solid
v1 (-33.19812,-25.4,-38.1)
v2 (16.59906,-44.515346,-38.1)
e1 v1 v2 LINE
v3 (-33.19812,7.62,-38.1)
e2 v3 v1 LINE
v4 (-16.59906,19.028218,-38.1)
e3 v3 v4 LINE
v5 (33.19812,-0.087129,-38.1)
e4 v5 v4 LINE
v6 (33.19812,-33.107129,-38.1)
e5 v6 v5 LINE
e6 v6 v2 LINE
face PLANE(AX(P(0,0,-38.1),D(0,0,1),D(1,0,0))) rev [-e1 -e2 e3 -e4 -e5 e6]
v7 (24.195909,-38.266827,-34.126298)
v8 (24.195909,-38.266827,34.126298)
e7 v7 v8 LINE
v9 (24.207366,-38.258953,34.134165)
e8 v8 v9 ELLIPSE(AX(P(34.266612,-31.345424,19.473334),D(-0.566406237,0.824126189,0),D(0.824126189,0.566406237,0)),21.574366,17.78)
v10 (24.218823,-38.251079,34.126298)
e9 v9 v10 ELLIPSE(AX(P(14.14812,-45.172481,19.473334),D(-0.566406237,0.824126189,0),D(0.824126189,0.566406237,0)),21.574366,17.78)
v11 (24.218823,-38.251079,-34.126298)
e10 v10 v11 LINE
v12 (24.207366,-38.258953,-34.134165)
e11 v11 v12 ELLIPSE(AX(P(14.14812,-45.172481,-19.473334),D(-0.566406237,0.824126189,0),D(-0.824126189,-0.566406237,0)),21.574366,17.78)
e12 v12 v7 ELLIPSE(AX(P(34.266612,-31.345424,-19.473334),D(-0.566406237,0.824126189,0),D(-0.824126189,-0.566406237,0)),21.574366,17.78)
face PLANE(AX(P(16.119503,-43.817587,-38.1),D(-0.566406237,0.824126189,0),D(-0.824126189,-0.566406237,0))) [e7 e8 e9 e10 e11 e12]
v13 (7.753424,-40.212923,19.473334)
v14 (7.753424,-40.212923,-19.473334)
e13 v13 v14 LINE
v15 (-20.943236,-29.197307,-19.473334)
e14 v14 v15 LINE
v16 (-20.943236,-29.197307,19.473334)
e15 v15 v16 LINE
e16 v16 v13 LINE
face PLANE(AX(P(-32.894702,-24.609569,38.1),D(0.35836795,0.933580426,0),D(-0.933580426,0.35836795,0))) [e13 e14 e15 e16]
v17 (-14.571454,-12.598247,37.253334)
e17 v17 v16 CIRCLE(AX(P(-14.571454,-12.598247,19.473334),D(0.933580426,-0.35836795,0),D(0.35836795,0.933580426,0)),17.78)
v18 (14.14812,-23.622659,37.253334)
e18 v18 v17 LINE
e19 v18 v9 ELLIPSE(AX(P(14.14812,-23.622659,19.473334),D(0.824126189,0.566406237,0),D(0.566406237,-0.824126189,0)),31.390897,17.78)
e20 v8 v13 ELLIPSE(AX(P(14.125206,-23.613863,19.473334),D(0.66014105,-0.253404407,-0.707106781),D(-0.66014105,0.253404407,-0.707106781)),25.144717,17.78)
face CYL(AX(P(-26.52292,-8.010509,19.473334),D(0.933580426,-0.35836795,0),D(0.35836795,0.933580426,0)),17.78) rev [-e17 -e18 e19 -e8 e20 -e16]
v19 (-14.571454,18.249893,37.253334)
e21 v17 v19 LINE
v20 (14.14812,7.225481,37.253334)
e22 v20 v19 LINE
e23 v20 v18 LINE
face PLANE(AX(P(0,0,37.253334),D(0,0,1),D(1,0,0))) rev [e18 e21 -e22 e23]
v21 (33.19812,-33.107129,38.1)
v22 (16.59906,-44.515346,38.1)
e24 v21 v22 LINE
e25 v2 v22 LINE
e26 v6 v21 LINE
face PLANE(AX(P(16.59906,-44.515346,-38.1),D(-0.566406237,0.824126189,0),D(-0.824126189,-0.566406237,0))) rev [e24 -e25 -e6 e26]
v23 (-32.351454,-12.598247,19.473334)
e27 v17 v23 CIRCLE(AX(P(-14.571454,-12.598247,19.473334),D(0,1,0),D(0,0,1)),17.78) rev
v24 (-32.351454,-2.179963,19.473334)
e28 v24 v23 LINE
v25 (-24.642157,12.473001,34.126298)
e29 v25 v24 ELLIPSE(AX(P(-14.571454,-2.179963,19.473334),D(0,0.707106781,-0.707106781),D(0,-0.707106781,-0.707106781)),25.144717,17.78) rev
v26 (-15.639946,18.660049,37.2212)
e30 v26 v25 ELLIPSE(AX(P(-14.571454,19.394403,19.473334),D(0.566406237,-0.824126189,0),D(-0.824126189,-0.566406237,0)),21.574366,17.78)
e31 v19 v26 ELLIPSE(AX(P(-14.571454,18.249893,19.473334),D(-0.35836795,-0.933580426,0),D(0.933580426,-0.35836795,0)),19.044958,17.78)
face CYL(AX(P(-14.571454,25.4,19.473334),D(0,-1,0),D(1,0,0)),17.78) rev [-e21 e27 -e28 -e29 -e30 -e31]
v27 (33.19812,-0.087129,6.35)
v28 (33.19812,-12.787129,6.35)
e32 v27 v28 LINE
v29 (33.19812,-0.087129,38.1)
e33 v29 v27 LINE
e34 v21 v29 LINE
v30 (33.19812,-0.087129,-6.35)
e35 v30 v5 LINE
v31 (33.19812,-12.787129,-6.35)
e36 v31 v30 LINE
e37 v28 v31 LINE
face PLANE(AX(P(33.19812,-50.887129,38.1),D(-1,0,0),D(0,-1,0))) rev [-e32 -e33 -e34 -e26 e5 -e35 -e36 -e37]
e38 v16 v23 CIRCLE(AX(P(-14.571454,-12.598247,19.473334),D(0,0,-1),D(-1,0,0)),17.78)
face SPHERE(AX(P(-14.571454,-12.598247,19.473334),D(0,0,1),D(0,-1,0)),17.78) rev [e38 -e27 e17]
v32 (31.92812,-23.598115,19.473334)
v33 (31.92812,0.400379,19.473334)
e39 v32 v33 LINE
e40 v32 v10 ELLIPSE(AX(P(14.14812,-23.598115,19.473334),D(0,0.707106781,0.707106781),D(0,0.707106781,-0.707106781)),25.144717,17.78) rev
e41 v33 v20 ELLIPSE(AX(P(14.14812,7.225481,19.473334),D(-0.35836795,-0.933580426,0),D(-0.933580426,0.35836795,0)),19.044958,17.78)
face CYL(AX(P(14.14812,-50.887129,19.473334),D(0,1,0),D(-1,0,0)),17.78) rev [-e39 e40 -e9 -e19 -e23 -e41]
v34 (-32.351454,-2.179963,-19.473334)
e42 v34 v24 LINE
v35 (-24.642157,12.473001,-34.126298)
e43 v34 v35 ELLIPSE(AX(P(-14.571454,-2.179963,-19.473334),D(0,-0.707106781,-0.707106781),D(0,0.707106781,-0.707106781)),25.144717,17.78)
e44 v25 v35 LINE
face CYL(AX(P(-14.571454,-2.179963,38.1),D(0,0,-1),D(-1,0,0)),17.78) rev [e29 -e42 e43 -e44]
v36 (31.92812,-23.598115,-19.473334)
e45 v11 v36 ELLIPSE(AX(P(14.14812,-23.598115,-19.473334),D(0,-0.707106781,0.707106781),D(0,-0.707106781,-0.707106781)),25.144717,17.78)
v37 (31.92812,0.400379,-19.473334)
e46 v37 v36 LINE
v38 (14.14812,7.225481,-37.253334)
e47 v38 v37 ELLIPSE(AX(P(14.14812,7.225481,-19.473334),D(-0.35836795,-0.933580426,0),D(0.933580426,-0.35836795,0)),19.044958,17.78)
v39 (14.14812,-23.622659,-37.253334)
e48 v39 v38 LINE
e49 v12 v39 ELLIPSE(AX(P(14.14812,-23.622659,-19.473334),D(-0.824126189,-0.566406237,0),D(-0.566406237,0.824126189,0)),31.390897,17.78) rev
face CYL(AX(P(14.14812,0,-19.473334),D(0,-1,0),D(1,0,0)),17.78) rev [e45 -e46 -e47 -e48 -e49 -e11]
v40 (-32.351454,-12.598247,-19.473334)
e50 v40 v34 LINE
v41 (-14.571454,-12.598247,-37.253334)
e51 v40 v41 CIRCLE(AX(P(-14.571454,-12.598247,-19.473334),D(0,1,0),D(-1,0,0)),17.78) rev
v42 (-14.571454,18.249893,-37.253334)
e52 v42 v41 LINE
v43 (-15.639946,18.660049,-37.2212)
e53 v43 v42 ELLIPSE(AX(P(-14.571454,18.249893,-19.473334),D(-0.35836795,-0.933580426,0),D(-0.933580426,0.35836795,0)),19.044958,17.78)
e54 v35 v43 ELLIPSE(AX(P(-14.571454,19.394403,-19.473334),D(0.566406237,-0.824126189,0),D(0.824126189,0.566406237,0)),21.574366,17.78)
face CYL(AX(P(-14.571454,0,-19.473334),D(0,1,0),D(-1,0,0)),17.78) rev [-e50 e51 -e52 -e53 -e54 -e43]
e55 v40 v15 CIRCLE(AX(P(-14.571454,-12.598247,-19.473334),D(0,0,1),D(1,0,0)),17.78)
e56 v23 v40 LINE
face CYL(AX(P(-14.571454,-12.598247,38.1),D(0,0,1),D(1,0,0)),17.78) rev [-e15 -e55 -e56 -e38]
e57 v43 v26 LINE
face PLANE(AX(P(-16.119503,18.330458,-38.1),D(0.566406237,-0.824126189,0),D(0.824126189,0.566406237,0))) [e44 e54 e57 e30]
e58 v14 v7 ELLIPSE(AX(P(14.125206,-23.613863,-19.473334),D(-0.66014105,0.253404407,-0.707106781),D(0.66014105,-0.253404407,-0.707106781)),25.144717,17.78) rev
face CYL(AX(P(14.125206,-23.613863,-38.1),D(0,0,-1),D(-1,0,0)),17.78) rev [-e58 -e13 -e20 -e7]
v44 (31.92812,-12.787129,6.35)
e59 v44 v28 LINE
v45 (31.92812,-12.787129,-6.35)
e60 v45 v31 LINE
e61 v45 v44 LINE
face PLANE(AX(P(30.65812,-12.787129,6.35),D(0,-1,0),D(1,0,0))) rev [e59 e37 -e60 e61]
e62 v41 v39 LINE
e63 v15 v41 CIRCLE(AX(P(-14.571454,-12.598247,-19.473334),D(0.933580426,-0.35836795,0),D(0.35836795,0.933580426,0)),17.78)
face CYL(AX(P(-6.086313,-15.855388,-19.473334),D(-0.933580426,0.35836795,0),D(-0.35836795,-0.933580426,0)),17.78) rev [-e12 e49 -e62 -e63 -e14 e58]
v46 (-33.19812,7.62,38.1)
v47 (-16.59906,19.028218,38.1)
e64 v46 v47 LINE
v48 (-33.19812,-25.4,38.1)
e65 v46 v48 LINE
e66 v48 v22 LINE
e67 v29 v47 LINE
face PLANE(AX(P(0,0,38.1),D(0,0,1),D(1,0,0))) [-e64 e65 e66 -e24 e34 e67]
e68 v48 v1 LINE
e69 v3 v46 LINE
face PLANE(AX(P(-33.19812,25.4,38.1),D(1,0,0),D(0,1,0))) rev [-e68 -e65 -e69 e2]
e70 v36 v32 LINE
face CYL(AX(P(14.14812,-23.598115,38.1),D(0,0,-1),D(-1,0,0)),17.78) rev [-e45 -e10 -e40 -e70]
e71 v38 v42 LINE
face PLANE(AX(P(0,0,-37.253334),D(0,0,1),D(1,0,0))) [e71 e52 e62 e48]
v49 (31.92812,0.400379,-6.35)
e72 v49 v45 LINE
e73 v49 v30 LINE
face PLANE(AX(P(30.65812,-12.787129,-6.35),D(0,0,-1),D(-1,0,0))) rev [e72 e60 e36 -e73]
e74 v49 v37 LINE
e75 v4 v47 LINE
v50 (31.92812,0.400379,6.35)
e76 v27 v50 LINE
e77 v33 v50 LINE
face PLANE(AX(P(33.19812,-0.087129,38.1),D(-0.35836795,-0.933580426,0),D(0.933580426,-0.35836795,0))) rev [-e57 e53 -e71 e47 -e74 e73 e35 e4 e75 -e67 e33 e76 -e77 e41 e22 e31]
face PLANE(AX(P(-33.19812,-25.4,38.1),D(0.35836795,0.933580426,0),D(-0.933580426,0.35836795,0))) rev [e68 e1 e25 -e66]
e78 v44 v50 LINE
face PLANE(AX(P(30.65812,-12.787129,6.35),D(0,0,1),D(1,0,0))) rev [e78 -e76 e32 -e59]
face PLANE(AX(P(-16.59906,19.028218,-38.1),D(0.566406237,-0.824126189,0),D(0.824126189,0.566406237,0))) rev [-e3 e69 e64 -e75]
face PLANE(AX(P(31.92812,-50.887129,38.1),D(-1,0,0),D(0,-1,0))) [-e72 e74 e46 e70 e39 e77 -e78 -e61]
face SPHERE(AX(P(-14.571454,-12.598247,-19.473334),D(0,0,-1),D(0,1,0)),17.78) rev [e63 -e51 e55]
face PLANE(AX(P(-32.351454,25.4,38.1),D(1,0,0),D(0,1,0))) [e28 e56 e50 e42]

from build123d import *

# Parameters (mm, degrees)
BOSS_EXTRUDE1_DEPTH = 38.1
CUT_EXTRUDE1_DEPTH  = 98.457965419
SHELL1_START        = -37.25333418
SHELL1_DEPTH        = 74.50666836
FILLET1_R           = 17.78
SKETCH3_W           = 12.7
SKETCH3_H           = 13.97
CUT_EXTRUDE2_DEPTH  = 2.54


# Read off the part's stored shape, not the designer's step: Shell1
with BuildPart() as part:
    # Sketch1 → Boss-Extrude1 (new, symmetric)
    with BuildSketch(Plane.XY):
        Polygon((-33.198119966, 25.4), (-33.198119966, -25.4), (33.198119966, -50.887128572), (33.198119966, -0.087128572), align=None)
    extrude(amount=BOSS_EXTRUDE1_DEPTH, both=True)

    # Sketch2 → Cut-Extrude1 (cut, through all)
    with BuildSketch(Plane.XY.offset(38.1)):
        Polygon((16.599059983, -44.515346429), (33.198119966, -33.107128572), (33.198119966, -50.887128572), align=None)
        Polygon((-16.599059983, 19.028217857), (-33.198119966, 25.4), (-33.198119966, 7.62), align=None)
    extrude(amount=-CUT_EXTRUDE1_DEPTH, mode=Mode.SUBTRACT)

    # Shell1 outline → Shell1 (cut)
    with BuildSketch(Plane.XY.offset(SHELL1_START)):
        Polygon((-32.351454146, 7.174547563), (-32.351454146, -24.818102704), (16.486612201, -43.565279915), (31.928119966, -32.952625656), (31.928119966, 0.400378753), (-15.639946381, 18.66004864), align=None)
    extrude(amount=SHELL1_DEPTH, mode=Mode.SUBTRACT)

    # Fillet1
    # the kernel refuses this fillet: 17.78 mm, written as the material it adds along each edge
    with BuildSketch(Plane(origin=(-14.571454146, -12.59824726, -19.47333418), x_dir=(-1, 0, 0), z_dir=(0, 0, -1))) as fillet1_piece_1_section:
        Polygon((0, 0), (FILLET1_R * 1.02, 0), (FILLET1_R * 1.02, -FILLET1_R * 0.701026577777), (FILLET1_R * 0.365535308531, -FILLET1_R * 0.952252035029), align=None)
    fillet1_piece_1 = extrude(amount=FILLET1_R * 1.02, mode=Mode.PRIVATE)
    fillet1_piece_1 = fillet1_piece_1 - Plane(origin=(-14.571454146, -12.59824726, -19.47333418), x_dir=(0.8241261886205663, 0.5664062369269417, 0), z_dir=(0, 0, -1)) * Sphere(FILLET1_R, mode=Mode.PRIVATE)
    add(fillet1_piece_1)
    with BuildSketch(Plane(origin=(-14.571454146, -12.59824726, 19.47333418), x_dir=(-1, 0, 0), z_dir=(0, 0, 1))) as fillet1_piece_2_section:
        Polygon((0, 0), (FILLET1_R * 1.02, 0), (FILLET1_R * 1.02, FILLET1_R * 0.701026577777), (FILLET1_R * 0.365535308531, FILLET1_R * 0.952252035029), align=None)
    fillet1_piece_2 = extrude(amount=FILLET1_R * 1.02, mode=Mode.PRIVATE)
    fillet1_piece_2 = fillet1_piece_2 - Plane(origin=(-14.571454146, -12.59824726, 19.47333418), x_dir=(0.8241261886205663, 0.5664062369269417, 0), z_dir=(0, 0, 1)) * Sphere(FILLET1_R, mode=Mode.PRIVATE)
    add(fillet1_piece_2)
    with BuildSketch(Plane(origin=(-20.943236289, -29.197307243, -37.25333418), x_dir=(0.3583679495405225, 0.9335804264990358, 0), z_dir=(0.9335804264990358, -0.3583679495405224, 0))) as fillet1_piece_3_section:
        with BuildLine():
            CenterArc((FILLET1_R, FILLET1_R), FILLET1_R, 180, 90)
            Line((0, FILLET1_R), (0, 0))
            Line((0, 0), (FILLET1_R, 0))
        make_face()
    fillet1_piece_3 = extrude(amount=84.542794822, mode=Mode.PRIVATE)
    fillet1_piece_3 = split(fillet1_piece_3, bisect_by=Plane(origin=(31.928119966, -33.01813641, -33.386694553), z_dir=(-1, 0, 0)), keep=Keep.TOP, mode=Mode.PRIVATE)
    fillet1_piece_3 = split(fillet1_piece_3, bisect_by=Plane(origin=(10.612775853, -47.602255791, -33.386694553), z_dir=(-0.5664062369254325, 0.8241261886216036, 0)), keep=Keep.TOP, mode=Mode.PRIVATE)
    add(fillet1_piece_3)
    with BuildSketch(Plane(origin=(31.928119966, -77.402625656, -37.25333418), x_dir=(-1, 0, 0), z_dir=(0, 1, 0))) as fillet1_piece_4_section:
        with BuildLine():
            CenterArc((FILLET1_R, FILLET1_R), FILLET1_R, 180, 90)
            Line((0, FILLET1_R), (0, 0))
            Line((0, 0), (FILLET1_R, 0))
        make_face()
    fillet1_piece_4 = extrude(amount=122.253004409, mode=Mode.PRIVATE)
    fillet1_piece_4 = split(fillet1_piece_4, bisect_by=Plane(origin=(33.987840467, -0.39027387, -33.467977185), z_dir=(-0.3583679495453051, -0.9335804264972, 0)), keep=Keep.TOP, mode=Mode.PRIVATE)
    fillet1_piece_4 = split(fillet1_piece_4, bisect_by=Plane(origin=(17.295340959, -43.875721799, -33.467977185), z_dir=(0.3583679495405224, 0.9335804264990358, 0)), keep=Keep.TOP, mode=Mode.PRIVATE)
    fillet1_piece_4 = split(fillet1_piece_4, bisect_by=Plane(origin=(36.497116542, -29.812441309, -33.467977185), z_dir=(-0.5664062369254325, 0.8241261886216036, 0)), keep=Keep.TOP, mode=Mode.PRIVATE)
    add(fillet1_piece_4)
    with BuildSketch(Plane(origin=(-32.351454146, 51.624547563, 37.25333418), x_dir=(1, 0, 0), z_dir=(0, -1, 0))) as fillet1_piece_5_section:
        with BuildLine():
            CenterArc((FILLET1_R, -FILLET1_R), FILLET1_R, 90, 90)
            Line((0, -FILLET1_R), (0, 0))
            Line((0, 0), (FILLET1_R, 0))
        make_face()
    fillet1_piece_5 = extrude(amount=64.222794823, mode=Mode.PRIVATE)
    fillet1_piece_5 = split(fillet1_piece_5, bisect_by=Plane(origin=(-19.793272657, 20.254361223, 33.481549938), z_dir=(-0.3583679495453051, -0.9335804264972, 0)), keep=Keep.TOP, mode=Mode.PRIVATE)
    fillet1_piece_5 = split(fillet1_piece_5, bisect_by=Plane(origin=(-33.346924572, 6.490379695, 33.481549938), z_dir=(0.5664062369446778, -0.8241261886083766, 0)), keep=Keep.TOP, mode=Mode.PRIVATE)
    add(fillet1_piece_5)
    with BuildSketch(Plane(origin=(-20.943236289, -29.197307243, 37.25333418), x_dir=(0.3583679495405225, 0.9335804264990358, 0), z_dir=(0.9335804264990358, -0.3583679495405224, 0))) as fillet1_piece_6_section:
        with BuildLine():
            CenterArc((FILLET1_R, -FILLET1_R), FILLET1_R, 90, 90)
            Line((0, -FILLET1_R), (0, 0))
            Line((0, 0), (FILLET1_R, 0))
        make_face()
    fillet1_piece_6 = extrude(amount=84.542794822, mode=Mode.PRIVATE)
    fillet1_piece_6 = split(fillet1_piece_6, bisect_by=Plane(origin=(31.928119966, -33.01813641, 33.386694553), z_dir=(-1, 0, 0)), keep=Keep.TOP, mode=Mode.PRIVATE)
    fillet1_piece_6 = split(fillet1_piece_6, bisect_by=Plane(origin=(10.612775853, -47.602255791, 33.386694553), z_dir=(-0.5664062369254325, 0.8241261886216036, 0)), keep=Keep.TOP, mode=Mode.PRIVATE)
    add(fillet1_piece_6)
    with BuildSketch(Plane(origin=(31.928119966, -77.402625656, 37.25333418), x_dir=(-1, 0, 0), z_dir=(0, 1, 0))) as fillet1_piece_7_section:
        with BuildLine():
            CenterArc((FILLET1_R, -FILLET1_R), FILLET1_R, 90, 90)
            Line((0, -FILLET1_R), (0, 0))
            Line((0, 0), (FILLET1_R, 0))
        make_face()
    fillet1_piece_7 = extrude(amount=122.253004409, mode=Mode.PRIVATE)
    fillet1_piece_7 = split(fillet1_piece_7, bisect_by=Plane(origin=(33.987840467, -0.39027387, 33.467977185), z_dir=(-0.3583679495453051, -0.9335804264972, 0)), keep=Keep.TOP, mode=Mode.PRIVATE)
    fillet1_piece_7 = split(fillet1_piece_7, bisect_by=Plane(origin=(17.295340959, -43.875721799, 33.467977185), z_dir=(0.3583679495405224, 0.9335804264990358, 0)), keep=Keep.TOP, mode=Mode.PRIVATE)
    fillet1_piece_7 = split(fillet1_piece_7, bisect_by=Plane(origin=(36.497116542, -29.812441309, 33.467977185), z_dir=(-0.5664062369254325, 0.8241261886216036, 0)), keep=Keep.TOP, mode=Mode.PRIVATE)
    add(fillet1_piece_7)
    with BuildSketch(Plane(origin=(-32.351454146, -24.818102704, -19.47333418), x_dir=(0, 1, 0), z_dir=(0, 0, 1))) as fillet1_piece_8:
        with BuildLine():
            CenterArc((FILLET1_R * 0.687280958605, -FILLET1_R), FILLET1_R, 90, 69)
            Line((-FILLET1_R * 0.246299467894, -FILLET1_R * 0.641632050459), (0, 0))
            Line((0, 0), (FILLET1_R * 0.687280958605, 0))
        make_face()
    extrude(amount=38.94666836)
    with BuildSketch(Plane(origin=(-32.351454146, 51.624547563, -37.25333418), x_dir=(1, 0, 0), z_dir=(0, -1, 0))) as fillet1_piece_9_section:
        with BuildLine():
            CenterArc((FILLET1_R, FILLET1_R), FILLET1_R, 180, 90)
            Line((0, FILLET1_R), (0, 0))
            Line((0, 0), (FILLET1_R, 0))
        make_face()
    fillet1_piece_9 = extrude(amount=64.222794823, mode=Mode.PRIVATE)
    fillet1_piece_9 = split(fillet1_piece_9, bisect_by=Plane(origin=(-19.793272657, 20.254361223, -33.481549938), z_dir=(-0.3583679495453051, -0.9335804264972, 0)), keep=Keep.TOP, mode=Mode.PRIVATE)
    fillet1_piece_9 = split(fillet1_piece_9, bisect_by=Plane(origin=(-33.346924572, 6.490379695, -33.481549938), z_dir=(0.5664062369446778, -0.8241261886083766, 0)), keep=Keep.TOP, mode=Mode.PRIVATE)
    add(fillet1_piece_9)
    with BuildSketch(Plane(origin=(-32.351454146, 7.174547563, -37.25333418), x_dir=(0.8241261886083765, 0.5664062369446778, 0), z_dir=(0, 0, 1)), Plane(origin=(16.486612201, -43.565279915, -37.25333418), x_dir=(-0.933580426499036, 0.3583679495405219, 0), z_dir=(0, 0, 1))) as fillet1_piece_10:
        with BuildLine():
            CenterArc((FILLET1_R * 0.526125451477, -FILLET1_R), FILLET1_R, 90, 55.499999999)
            Line((-FILLET1_R * 0.298000737132, -FILLET1_R * 0.433593763055), (0, 0))
            Line((0, 0), (FILLET1_R * 0.526125451477, 0))
        make_face()
    extrude(amount=74.50666836)
    with BuildSketch(Plane(origin=(31.928119966, -32.952625656, -37.25333418), x_dir=(0, 1, 0), z_dir=(0, 0, 1))) as fillet1_piece_11:
        with BuildLine():
            CenterArc((FILLET1_R * 0.526125451492, FILLET1_R), FILLET1_R, 214.5, 55.5)
            Line((-FILLET1_R * 0.29800073713, FILLET1_R * 0.433593763075), (0, 0))
            Line((0, 0), (FILLET1_R * 0.526125451492, 0))
        make_face()
    extrude(amount=74.50666836)

    # Sketch3 → Cut-Extrude2 (cut)
    with BuildSketch(Plane(origin=(33.198119966, 0, 0), x_dir=(0, 0, -1), z_dir=(1, 0, 0))):
        with Locations((0, -5.802128572)):
            Rectangle(SKETCH3_W, SKETCH3_H)
    extrude(amount=-CUT_EXTRUDE2_DEPTH, mode=Mode.SUBTRACT)


solid = part.part
